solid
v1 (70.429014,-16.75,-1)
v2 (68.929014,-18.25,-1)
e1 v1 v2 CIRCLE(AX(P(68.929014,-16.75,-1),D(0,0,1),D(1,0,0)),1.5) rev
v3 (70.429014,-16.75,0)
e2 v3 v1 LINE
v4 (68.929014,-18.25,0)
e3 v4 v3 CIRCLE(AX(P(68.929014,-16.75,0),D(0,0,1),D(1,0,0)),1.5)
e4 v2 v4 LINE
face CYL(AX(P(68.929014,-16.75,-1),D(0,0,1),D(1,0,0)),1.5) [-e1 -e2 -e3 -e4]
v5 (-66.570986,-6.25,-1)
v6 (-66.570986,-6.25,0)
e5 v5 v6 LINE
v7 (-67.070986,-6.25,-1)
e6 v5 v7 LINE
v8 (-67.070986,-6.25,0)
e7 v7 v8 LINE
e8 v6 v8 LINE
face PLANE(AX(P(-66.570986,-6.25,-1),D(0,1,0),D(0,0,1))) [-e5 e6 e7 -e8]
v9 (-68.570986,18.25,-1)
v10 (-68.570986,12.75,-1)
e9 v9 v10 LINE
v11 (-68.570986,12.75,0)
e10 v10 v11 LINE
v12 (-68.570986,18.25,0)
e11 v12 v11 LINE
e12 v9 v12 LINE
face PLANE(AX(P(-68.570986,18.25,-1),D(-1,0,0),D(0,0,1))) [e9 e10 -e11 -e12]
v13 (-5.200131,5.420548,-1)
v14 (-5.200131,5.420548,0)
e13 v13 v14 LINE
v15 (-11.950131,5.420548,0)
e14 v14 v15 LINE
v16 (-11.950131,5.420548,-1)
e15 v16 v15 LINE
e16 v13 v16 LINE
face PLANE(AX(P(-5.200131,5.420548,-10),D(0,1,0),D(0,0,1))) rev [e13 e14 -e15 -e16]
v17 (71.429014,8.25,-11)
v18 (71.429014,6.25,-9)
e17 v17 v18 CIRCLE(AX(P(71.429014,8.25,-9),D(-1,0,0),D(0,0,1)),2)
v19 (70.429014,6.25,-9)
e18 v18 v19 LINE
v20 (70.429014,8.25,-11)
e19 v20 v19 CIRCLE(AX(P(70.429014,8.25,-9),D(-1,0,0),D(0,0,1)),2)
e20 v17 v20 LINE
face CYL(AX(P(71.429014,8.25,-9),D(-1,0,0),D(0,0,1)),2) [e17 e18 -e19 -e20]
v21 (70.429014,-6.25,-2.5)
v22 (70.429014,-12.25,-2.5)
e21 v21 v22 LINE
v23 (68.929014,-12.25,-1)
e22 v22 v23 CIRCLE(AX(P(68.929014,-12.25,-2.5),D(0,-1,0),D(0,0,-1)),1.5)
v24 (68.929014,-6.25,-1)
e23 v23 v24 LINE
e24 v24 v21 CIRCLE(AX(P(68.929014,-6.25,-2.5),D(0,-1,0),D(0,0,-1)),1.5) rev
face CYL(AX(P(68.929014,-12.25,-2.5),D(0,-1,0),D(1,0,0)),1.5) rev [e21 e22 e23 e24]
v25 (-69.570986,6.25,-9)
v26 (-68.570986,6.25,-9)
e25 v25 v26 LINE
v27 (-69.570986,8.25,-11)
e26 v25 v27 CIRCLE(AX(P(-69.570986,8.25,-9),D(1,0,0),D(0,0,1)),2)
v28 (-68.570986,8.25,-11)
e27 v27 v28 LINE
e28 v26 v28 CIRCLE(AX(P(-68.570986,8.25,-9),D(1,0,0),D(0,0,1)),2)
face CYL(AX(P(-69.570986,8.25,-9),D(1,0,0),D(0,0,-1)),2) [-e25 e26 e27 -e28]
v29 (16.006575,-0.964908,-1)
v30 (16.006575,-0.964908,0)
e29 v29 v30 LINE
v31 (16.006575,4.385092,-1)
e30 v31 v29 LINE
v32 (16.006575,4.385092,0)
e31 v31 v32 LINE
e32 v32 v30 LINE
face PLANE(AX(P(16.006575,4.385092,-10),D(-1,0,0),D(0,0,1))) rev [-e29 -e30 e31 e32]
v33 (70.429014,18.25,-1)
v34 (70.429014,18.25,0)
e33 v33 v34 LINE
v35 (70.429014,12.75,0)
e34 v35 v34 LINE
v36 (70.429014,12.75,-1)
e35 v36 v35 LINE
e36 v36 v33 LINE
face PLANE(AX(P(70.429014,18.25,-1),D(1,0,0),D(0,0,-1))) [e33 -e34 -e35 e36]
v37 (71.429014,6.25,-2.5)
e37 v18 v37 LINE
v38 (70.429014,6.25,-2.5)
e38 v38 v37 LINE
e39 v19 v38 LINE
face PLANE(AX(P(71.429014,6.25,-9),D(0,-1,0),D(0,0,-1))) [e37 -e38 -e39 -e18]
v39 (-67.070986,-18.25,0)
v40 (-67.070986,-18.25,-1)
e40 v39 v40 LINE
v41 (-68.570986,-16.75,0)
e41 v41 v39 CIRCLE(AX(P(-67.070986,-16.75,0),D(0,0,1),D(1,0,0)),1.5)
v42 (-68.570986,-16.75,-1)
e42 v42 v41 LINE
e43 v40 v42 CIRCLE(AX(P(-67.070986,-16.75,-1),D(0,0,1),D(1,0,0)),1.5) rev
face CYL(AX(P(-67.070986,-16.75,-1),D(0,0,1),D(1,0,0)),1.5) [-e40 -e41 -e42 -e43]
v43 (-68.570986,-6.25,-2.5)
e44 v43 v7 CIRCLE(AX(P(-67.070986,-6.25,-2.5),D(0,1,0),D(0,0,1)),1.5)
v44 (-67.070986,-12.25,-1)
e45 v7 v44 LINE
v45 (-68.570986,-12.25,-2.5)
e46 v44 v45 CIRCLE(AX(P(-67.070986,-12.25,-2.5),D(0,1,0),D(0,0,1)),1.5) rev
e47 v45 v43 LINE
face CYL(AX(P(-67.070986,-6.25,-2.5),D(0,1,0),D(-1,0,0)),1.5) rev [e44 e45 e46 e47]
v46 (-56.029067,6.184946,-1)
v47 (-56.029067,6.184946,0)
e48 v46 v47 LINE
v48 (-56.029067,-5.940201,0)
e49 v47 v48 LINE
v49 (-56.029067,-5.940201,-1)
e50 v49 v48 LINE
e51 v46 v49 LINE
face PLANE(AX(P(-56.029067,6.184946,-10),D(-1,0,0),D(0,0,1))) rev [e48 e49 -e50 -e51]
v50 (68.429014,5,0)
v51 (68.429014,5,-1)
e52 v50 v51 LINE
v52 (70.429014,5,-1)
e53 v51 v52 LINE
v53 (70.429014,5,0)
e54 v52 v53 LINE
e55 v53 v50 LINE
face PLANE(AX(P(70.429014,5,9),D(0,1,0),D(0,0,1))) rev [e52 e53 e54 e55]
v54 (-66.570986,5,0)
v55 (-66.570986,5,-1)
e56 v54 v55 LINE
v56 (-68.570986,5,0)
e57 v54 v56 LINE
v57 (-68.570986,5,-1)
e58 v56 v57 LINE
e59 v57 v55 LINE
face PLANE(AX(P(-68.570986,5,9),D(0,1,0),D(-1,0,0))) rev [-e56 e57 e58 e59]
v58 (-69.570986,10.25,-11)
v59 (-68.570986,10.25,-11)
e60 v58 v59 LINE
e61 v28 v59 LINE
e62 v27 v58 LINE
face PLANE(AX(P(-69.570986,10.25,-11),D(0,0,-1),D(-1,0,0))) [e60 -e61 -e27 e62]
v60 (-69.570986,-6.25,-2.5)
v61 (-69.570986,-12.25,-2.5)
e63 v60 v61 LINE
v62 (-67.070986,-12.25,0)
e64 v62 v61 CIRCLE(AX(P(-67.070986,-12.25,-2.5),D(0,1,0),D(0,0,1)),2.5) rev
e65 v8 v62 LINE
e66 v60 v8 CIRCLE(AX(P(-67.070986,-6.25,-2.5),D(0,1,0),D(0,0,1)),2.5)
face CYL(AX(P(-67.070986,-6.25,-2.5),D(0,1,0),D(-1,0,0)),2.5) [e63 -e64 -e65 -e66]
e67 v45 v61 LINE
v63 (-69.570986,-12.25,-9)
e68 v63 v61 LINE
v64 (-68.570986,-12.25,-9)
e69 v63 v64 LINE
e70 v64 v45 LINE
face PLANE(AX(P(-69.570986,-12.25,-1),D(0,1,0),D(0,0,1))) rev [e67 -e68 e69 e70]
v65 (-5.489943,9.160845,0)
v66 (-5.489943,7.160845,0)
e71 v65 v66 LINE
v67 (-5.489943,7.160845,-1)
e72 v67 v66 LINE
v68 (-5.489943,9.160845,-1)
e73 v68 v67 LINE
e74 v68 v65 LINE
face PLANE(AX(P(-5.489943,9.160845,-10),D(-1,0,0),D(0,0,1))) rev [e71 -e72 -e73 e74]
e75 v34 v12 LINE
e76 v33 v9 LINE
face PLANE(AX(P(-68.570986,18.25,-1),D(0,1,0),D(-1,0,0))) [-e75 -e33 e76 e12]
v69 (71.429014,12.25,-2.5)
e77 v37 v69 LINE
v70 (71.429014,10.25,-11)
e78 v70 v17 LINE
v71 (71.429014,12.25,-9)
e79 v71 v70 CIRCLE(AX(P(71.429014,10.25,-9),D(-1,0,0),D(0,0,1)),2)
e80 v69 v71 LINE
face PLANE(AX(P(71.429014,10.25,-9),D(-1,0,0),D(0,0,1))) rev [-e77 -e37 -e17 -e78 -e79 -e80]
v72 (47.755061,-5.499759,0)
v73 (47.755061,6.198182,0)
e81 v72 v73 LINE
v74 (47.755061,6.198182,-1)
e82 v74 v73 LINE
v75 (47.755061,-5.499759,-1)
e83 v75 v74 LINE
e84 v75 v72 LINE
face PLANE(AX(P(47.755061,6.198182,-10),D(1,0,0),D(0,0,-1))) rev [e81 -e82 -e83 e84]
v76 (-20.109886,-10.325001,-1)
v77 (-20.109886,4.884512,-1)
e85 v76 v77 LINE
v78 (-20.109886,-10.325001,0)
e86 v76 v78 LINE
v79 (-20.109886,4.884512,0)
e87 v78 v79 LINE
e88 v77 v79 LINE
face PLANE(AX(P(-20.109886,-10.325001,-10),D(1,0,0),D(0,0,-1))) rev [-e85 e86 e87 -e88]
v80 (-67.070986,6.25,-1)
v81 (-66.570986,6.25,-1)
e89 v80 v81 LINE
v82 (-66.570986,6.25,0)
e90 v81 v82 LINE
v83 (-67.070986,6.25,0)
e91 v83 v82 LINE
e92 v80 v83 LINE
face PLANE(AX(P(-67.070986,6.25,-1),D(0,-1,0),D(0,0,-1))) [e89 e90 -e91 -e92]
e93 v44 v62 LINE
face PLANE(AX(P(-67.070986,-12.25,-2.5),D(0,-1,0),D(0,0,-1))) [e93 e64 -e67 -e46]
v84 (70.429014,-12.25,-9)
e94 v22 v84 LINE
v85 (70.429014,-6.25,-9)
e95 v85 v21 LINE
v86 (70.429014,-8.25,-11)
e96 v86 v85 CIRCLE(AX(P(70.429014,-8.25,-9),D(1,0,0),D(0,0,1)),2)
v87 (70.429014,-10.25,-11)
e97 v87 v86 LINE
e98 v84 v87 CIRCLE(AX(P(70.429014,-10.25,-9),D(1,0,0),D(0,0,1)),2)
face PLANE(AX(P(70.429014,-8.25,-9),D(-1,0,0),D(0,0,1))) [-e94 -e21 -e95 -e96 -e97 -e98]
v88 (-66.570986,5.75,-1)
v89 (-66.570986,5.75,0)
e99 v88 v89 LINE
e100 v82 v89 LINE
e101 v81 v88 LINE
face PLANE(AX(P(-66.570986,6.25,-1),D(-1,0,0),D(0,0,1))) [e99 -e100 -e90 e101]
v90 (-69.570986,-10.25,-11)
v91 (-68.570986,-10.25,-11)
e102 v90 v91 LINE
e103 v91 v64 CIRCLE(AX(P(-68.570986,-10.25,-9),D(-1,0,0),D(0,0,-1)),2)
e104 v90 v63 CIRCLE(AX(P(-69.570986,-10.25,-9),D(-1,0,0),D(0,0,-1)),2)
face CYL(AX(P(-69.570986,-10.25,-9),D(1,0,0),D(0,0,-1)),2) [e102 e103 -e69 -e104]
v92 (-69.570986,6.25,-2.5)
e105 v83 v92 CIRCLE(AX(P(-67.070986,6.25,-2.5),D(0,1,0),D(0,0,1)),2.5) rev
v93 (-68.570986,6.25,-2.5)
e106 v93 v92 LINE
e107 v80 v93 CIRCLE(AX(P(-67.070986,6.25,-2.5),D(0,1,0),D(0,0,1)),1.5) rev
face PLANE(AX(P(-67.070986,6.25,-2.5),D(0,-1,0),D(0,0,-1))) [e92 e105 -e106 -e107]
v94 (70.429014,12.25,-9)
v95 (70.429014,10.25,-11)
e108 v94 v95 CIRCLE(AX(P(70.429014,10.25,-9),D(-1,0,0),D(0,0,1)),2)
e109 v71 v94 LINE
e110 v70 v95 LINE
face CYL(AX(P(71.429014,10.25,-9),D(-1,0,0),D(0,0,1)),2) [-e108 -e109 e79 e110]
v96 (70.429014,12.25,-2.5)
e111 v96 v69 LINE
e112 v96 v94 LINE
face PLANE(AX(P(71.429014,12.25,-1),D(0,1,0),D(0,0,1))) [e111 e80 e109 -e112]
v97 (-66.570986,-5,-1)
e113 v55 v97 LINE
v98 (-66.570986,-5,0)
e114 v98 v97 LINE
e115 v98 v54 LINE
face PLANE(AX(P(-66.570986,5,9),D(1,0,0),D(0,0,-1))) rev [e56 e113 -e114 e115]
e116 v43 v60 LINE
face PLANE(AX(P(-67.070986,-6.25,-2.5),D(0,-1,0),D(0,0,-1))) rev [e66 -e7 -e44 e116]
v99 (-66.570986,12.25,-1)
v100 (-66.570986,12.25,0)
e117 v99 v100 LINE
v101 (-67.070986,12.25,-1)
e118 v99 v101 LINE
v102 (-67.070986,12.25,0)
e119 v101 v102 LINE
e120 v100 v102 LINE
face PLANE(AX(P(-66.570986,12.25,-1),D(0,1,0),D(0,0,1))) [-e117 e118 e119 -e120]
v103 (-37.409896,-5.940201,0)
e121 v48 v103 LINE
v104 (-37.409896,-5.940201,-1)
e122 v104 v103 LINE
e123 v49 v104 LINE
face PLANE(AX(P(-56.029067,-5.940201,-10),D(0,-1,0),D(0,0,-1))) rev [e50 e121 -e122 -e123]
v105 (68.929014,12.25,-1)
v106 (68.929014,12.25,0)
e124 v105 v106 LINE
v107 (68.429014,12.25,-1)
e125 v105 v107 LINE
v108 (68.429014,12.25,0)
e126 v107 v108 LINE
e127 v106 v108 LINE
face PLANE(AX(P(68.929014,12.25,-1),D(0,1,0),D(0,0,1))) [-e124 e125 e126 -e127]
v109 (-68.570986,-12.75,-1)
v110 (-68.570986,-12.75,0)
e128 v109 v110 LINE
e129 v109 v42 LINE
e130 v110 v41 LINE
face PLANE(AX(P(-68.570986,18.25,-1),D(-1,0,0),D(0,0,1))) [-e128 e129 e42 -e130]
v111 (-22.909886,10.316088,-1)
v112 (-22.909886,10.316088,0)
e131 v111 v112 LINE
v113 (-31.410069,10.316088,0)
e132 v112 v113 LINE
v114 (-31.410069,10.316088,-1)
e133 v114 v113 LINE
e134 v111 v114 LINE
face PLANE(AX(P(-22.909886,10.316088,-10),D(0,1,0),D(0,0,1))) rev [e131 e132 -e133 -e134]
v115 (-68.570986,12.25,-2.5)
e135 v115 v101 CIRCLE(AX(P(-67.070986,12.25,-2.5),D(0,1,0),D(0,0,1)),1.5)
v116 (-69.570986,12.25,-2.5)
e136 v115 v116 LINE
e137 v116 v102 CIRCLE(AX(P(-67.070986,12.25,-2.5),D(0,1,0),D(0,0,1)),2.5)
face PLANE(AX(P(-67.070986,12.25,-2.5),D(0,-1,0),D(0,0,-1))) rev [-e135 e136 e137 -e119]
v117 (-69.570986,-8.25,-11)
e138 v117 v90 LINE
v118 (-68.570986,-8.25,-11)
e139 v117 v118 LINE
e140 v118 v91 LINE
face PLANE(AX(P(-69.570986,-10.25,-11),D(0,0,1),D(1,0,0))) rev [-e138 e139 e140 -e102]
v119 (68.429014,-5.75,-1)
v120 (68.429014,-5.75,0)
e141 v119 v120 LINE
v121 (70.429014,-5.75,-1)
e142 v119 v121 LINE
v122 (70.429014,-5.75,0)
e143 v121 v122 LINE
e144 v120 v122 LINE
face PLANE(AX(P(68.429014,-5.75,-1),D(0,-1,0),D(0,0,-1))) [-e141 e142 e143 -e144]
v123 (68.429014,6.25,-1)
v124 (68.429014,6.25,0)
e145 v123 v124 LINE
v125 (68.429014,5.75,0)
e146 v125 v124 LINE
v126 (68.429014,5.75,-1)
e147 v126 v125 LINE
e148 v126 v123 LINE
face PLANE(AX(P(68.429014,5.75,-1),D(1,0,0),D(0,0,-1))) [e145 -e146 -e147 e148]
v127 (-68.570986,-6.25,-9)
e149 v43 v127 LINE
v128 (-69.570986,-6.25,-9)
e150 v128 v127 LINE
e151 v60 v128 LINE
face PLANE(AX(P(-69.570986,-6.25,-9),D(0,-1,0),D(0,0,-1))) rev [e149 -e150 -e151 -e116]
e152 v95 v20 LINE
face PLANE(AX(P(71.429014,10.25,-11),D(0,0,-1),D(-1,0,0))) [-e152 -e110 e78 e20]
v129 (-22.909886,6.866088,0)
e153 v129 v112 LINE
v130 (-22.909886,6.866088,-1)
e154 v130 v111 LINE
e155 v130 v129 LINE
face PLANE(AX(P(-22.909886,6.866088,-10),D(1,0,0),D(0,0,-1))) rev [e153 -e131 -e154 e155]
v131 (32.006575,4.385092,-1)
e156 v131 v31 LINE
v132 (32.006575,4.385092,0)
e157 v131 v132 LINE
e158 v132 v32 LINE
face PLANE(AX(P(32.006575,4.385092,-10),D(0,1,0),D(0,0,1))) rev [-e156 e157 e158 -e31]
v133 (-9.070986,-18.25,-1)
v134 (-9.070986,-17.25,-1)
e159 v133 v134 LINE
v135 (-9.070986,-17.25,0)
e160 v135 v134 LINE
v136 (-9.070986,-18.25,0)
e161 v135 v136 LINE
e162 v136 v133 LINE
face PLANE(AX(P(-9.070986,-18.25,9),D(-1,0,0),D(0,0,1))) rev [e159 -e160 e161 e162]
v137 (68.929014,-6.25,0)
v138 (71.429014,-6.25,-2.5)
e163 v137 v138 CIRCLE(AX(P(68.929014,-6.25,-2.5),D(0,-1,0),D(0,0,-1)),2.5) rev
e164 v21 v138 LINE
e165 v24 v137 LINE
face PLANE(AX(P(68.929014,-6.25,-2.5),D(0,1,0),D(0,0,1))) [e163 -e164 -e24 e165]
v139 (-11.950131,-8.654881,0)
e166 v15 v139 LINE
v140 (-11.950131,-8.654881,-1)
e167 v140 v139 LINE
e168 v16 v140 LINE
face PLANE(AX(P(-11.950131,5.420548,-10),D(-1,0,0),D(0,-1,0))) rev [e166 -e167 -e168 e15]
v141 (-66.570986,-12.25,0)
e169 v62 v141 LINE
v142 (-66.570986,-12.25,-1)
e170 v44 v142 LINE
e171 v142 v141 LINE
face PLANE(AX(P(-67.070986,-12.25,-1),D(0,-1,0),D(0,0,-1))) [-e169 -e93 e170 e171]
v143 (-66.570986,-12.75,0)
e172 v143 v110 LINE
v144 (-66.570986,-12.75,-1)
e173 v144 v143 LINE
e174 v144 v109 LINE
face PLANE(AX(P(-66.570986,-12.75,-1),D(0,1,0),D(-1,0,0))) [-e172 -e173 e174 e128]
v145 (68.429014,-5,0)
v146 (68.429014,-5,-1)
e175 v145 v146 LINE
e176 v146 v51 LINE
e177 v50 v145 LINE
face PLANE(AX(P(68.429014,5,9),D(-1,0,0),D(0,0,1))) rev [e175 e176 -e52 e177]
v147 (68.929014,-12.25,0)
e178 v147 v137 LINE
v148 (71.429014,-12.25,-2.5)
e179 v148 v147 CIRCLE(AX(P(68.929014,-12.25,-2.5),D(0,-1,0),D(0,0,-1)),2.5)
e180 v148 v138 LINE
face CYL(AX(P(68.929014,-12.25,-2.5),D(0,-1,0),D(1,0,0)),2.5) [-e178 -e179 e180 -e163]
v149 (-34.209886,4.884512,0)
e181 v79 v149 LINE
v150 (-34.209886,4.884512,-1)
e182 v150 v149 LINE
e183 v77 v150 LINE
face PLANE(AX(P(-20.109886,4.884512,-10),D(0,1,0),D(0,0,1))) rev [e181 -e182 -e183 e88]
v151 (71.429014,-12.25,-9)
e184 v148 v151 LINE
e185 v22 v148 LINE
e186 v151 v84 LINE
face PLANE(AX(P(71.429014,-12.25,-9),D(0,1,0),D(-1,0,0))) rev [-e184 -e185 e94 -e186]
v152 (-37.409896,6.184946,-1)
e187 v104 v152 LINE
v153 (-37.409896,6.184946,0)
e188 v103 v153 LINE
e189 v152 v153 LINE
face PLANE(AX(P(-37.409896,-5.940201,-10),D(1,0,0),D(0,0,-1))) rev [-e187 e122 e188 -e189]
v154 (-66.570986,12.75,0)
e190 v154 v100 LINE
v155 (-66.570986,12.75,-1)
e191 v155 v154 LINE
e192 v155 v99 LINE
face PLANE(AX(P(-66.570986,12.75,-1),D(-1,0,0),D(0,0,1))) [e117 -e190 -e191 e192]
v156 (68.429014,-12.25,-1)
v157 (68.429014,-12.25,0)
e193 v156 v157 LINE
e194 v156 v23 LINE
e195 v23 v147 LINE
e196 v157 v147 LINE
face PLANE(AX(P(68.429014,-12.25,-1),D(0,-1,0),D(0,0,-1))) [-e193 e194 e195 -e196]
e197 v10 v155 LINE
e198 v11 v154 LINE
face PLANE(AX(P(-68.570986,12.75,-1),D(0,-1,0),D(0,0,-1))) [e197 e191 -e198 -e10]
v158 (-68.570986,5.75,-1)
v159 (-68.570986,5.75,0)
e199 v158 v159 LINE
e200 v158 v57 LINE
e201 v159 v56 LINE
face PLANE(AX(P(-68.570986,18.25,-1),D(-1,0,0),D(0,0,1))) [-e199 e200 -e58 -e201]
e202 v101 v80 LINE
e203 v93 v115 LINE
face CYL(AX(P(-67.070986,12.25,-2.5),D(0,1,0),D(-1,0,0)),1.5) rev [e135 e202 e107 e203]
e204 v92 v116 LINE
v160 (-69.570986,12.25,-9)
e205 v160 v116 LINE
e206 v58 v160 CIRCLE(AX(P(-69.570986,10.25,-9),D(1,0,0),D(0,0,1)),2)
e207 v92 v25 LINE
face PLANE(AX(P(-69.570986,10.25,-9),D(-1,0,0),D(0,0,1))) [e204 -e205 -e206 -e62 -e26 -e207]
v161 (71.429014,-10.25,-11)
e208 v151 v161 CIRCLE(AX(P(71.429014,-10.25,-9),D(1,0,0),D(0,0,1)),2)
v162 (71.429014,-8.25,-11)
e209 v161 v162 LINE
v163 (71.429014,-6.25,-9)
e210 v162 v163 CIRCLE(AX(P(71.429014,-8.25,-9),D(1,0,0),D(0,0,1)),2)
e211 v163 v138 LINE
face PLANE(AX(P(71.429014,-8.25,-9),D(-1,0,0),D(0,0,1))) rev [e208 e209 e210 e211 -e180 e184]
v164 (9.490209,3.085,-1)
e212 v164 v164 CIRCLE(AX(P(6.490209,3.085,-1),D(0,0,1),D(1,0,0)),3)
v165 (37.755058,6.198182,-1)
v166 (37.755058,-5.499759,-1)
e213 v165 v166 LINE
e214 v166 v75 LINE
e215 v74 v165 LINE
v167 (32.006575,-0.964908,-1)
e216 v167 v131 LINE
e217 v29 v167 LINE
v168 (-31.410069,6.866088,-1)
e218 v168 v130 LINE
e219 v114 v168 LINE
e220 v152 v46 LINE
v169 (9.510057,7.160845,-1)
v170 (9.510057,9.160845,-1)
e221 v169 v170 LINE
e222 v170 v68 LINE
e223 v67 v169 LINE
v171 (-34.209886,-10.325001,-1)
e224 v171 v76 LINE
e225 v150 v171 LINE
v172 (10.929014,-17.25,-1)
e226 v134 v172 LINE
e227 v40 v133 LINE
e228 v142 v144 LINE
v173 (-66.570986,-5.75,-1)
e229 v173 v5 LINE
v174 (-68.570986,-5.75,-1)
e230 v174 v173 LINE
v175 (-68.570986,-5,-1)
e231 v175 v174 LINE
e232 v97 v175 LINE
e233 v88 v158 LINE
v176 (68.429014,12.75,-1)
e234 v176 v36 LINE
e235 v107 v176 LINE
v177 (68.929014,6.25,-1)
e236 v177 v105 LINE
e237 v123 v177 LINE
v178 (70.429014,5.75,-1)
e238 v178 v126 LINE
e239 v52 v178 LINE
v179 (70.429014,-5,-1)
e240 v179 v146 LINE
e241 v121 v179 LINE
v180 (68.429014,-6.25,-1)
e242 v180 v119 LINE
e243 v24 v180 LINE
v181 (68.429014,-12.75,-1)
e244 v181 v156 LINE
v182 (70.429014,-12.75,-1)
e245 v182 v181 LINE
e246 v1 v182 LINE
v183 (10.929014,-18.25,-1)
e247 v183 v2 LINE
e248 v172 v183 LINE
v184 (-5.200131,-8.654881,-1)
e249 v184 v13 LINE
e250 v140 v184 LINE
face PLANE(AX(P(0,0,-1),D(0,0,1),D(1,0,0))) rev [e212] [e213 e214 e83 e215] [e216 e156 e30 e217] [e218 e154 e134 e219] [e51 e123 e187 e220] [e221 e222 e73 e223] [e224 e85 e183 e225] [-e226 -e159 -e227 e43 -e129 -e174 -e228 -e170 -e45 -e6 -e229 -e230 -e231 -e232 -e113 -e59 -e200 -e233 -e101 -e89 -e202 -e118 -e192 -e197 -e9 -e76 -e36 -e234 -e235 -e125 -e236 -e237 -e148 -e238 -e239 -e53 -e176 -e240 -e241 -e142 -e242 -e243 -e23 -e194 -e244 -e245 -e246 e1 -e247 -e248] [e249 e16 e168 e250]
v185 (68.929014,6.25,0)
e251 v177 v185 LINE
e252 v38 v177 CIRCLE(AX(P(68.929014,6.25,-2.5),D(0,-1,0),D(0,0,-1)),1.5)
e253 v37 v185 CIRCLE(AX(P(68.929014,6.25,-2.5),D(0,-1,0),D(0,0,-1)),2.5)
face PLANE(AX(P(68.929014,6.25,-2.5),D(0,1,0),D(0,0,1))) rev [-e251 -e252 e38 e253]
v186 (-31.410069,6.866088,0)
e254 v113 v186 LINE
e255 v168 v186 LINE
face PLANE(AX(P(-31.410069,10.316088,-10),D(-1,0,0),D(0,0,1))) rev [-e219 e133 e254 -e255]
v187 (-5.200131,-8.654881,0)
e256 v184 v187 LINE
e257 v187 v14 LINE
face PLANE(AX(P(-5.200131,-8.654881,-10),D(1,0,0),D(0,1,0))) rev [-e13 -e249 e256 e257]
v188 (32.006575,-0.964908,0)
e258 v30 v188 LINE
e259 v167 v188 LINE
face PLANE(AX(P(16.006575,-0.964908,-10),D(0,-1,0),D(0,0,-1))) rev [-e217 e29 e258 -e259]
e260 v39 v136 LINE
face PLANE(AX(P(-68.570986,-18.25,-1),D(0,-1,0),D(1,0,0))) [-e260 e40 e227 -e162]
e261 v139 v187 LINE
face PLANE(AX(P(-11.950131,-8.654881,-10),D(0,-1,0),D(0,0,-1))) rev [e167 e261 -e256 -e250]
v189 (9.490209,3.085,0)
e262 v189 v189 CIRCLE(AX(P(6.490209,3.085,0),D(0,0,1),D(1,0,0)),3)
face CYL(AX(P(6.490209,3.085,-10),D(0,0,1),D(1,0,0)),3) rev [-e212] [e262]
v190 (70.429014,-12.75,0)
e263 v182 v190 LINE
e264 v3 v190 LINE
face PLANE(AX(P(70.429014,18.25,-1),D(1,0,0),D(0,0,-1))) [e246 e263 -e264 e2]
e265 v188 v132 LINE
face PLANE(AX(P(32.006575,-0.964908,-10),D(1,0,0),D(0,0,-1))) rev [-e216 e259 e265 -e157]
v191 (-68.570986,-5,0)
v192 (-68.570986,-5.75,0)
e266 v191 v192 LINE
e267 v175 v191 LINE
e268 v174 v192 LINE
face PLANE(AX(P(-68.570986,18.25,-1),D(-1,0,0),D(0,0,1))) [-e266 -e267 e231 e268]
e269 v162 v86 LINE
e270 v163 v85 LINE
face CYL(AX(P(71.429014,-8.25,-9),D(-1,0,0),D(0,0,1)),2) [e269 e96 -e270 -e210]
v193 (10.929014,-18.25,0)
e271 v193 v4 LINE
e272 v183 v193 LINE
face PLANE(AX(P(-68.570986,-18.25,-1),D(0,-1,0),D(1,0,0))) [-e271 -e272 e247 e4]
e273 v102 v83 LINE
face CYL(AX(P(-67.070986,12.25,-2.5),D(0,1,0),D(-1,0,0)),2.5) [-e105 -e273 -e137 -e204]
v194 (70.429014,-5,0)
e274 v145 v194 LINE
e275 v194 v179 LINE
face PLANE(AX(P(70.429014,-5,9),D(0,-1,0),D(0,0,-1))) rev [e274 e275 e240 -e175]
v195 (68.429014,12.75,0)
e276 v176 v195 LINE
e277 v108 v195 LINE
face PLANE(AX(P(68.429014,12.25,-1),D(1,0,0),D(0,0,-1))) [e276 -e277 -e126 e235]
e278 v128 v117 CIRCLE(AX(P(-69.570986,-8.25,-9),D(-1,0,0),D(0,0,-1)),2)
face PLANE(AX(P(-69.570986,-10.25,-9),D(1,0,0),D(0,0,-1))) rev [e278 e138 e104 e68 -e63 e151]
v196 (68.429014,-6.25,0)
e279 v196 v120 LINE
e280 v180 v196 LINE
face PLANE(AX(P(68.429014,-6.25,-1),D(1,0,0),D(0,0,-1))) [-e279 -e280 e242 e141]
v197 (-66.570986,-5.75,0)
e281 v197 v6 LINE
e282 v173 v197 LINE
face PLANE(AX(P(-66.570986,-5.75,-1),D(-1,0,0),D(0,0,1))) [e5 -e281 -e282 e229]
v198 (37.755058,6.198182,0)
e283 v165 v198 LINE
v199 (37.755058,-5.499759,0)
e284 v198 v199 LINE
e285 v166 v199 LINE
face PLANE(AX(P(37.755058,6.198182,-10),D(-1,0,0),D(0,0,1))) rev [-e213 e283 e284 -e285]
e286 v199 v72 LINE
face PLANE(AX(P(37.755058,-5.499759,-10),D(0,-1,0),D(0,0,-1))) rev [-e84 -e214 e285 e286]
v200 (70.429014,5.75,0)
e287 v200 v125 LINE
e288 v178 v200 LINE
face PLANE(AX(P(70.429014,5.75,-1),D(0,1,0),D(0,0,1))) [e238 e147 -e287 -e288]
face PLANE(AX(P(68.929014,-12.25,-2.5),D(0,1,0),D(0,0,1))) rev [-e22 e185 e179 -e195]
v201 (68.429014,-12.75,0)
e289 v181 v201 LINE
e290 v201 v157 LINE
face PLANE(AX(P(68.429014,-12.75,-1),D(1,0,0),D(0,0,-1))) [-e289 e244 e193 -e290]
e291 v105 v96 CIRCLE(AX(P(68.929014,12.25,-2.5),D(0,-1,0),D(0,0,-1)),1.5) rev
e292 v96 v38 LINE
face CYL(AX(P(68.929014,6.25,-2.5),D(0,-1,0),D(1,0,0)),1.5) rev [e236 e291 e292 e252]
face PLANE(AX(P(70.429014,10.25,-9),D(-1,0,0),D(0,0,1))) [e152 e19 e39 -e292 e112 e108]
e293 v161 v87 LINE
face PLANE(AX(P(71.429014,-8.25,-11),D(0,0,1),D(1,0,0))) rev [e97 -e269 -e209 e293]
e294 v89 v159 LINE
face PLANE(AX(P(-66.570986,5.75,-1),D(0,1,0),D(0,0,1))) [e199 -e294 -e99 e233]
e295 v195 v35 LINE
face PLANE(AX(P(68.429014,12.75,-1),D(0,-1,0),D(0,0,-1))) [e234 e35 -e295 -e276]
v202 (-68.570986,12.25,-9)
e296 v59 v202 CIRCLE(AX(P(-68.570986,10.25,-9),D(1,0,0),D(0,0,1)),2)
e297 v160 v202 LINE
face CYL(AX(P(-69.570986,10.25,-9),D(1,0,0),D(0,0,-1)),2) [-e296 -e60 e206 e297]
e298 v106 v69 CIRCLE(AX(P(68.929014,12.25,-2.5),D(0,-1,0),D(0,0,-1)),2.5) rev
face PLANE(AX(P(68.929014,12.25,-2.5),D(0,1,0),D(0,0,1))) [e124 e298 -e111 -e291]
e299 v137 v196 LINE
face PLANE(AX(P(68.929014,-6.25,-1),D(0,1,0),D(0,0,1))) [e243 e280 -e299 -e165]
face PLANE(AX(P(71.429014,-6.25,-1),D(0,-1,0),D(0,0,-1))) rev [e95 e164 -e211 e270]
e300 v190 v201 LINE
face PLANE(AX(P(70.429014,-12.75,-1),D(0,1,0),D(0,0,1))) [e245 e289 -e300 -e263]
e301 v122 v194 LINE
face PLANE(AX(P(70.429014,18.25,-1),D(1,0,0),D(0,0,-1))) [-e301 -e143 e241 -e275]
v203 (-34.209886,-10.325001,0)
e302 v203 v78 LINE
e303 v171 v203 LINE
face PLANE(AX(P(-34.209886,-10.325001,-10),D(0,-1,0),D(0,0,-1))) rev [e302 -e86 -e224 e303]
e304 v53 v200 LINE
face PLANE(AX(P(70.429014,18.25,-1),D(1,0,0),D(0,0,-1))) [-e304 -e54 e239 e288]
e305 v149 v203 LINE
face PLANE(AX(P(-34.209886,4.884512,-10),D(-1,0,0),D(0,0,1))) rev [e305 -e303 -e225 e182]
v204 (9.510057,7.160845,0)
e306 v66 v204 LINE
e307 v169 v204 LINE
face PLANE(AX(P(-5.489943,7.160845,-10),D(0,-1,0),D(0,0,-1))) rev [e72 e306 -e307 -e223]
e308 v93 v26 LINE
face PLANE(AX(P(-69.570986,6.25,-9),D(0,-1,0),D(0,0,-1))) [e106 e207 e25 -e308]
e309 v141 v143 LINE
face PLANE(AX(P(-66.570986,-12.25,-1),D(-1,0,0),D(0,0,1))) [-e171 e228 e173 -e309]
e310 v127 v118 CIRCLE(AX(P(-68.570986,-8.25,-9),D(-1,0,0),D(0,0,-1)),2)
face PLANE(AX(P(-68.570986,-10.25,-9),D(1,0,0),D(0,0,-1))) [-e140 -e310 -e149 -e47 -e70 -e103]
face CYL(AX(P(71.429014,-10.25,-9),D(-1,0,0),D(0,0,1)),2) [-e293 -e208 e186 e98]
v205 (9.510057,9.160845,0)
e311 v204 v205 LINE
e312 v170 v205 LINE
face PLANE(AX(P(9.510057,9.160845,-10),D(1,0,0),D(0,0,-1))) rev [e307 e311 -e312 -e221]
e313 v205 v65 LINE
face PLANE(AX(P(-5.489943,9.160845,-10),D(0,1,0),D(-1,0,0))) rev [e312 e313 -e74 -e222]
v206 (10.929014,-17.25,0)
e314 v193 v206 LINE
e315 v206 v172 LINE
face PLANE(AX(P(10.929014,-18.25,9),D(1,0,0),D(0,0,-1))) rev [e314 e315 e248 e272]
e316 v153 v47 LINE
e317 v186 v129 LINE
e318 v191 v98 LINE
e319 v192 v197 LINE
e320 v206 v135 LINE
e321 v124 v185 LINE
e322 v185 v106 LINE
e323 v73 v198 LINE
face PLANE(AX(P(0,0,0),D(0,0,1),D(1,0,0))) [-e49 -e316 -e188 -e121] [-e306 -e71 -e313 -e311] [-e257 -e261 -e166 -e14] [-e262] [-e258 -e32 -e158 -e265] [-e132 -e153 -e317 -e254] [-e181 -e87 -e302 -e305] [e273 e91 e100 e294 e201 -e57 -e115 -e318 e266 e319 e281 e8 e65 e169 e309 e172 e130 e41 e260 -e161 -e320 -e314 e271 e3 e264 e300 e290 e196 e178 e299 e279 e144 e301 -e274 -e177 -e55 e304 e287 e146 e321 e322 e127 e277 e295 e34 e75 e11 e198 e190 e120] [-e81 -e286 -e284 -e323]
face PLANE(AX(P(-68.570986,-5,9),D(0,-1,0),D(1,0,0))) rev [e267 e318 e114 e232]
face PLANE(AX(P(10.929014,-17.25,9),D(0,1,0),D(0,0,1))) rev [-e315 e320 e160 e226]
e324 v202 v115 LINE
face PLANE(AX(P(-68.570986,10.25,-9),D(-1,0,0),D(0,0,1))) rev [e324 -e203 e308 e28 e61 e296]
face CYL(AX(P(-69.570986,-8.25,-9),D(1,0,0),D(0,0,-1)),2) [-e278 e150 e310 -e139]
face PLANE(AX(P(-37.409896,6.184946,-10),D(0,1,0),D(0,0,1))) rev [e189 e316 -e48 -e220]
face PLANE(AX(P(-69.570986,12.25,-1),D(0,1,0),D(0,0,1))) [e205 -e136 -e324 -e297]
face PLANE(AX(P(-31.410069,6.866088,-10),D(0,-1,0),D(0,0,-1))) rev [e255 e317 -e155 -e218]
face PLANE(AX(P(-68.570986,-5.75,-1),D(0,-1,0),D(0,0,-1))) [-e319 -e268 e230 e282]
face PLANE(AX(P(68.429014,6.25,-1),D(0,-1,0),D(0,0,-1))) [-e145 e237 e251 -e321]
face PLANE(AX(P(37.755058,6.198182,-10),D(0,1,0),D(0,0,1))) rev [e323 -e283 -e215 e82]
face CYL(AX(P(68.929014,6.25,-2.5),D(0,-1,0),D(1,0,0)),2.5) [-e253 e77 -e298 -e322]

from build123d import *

# Parameters (mm, degrees)
SKETCH1_W                       = 139
SKETCH1_H                       = 36.5
BASE_FLANGE1_DEPTH              = 1
EDGE_FLANGE1_STRIP_W            = 7
EDGE_FLANGE1_STRIP_H            = 1
EDGE_FLANGE1_STRIP_CUT_DEPTH    = 6
EDGE_FLANGE1_RELIEF_W           = 7.5
EDGE_FLANGE1_RELIEF_H           = 0.5
EDGE_FLANGE1_RELIEF_CUT_DEPTH   = 1
EDGE_FLANGE1_STRIP_2_W          = 7
EDGE_FLANGE1_STRIP_2_H          = 1
EDGE_FLANGE1_STRIP_CUT_2_DEPTH  = 6
EDGE_FLANGE1_RELIEF_2_W         = 7.5
EDGE_FLANGE1_RELIEF_2_H         = 0.5
EDGE_FLANGE1_RELIEF_CUT_2_DEPTH = 1
EDGE_FLANGE1_DEPTH              = 6
EDGE_FLANGE1_START              = -1
EDGE_FLANGE1_FLAT_DEPTH         = 1
EDGE_FLANGE1_BEND_DEPTH         = 6
EDGE_FLANGE1_FLAT_2_DEPTH       = 1
EDGE_FLANGE2_STRIP_W            = 7
EDGE_FLANGE2_STRIP_H            = 1
EDGE_FLANGE2_STRIP_CUT_DEPTH    = 6
EDGE_FLANGE2_RELIEF_W           = 7.5
EDGE_FLANGE2_RELIEF_H           = 0.5
EDGE_FLANGE2_RELIEF_CUT_DEPTH   = 1
EDGE_FLANGE2_STRIP_2_W          = 7
EDGE_FLANGE2_STRIP_2_H          = 1
EDGE_FLANGE2_STRIP_CUT_2_DEPTH  = 6
EDGE_FLANGE2_RELIEF_2_W         = 7.5
EDGE_FLANGE2_RELIEF_2_H         = 0.5
EDGE_FLANGE2_RELIEF_CUT_2_DEPTH = 1
EDGE_FLANGE2_DEPTH              = 6
EDGE_FLANGE2_START              = 1
EDGE_FLANGE2_FLAT_DEPTH         = 1
EDGE_FLANGE2_BEND_DEPTH         = 6
EDGE_FLANGE2_FLAT_2_DEPTH       = 1
SKETCH20_W                      = 20
SKETCH20_H                      = 1
SKETCH20_W_2                    = 2
SKETCH20_H_2                    = 10
CUT_EXTRUDE1_DEPTH              = 10
FILLET1_R                       = 1.5
SKETCH21_W                      = 15
SKETCH21_H                      = 2
SKETCH21_W_2                    = 17.619171599
SKETCH21_H_2                    = 11.12514716
SKETCH21_W_3                    = 13.1
SKETCH21_H_3                    = 14.209512824
SKETCH21_W_4                    = 5.75
SKETCH21_H_4                    = 13.075429167
SKETCH21_H_5                    = 4.35
CUT_EXTRUDE2_DEPTH              = 10
SKETCH22_R                      = 3
SKETCH22_W                      = 8.50018288
SKETCH22_H                      = 3.45
SKETCH22_W_2                    = 10.00000232
SKETCH22_H_2                    = 11.697941419
SKETCH22_W_3                    = 18.619171599
SKETCH22_H_3                    = 12.12514716
SKETCH22_W_4                    = 17.619171599
SKETCH22_H_4                    = 11.12514716
SKETCH22_W_5                    = 14.1
SKETCH22_H_5                    = 15.209512824
SKETCH22_W_6                    = 13.1
SKETCH22_H_6                    = 14.209512824
SKETCH22_W_7                    = 6.75
SKETCH22_H_7                    = 14.075429167
SKETCH22_W_8                    = 5.75
SKETCH22_H_8                    = 13.075429167
SKETCH22_W_9                    = 16
SKETCH22_H_9                    = 5.35
SKETCH22_W_10                   = 15
SKETCH22_H_10                   = 4.35
CUT_EXTRUDE3_DEPTH              = 10


# Sheet-metal steps are written as plain solids
with BuildPart() as part:
    # Sketch1 → Base-Flange1 (new body)
    with BuildSketch(Plane.XY):
        with Locations((0.929014267, 0)):
            Rectangle(SKETCH1_W, SKETCH1_H)
    extrude(amount=-BASE_FLANGE1_DEPTH)

    # Edge-Flange1 strip (across the edge) → Edge-Flange1 strip cut (cut)
    with BuildSketch(Plane(origin=(-68.570985733, 6.25, -1), x_dir=(1, 0, 0), z_dir=(0, 1, 0))):
        with Locations((-2, -0.5)):
            Rectangle(EDGE_FLANGE1_STRIP_W, EDGE_FLANGE1_STRIP_H)
    extrude(amount=EDGE_FLANGE1_STRIP_CUT_DEPTH, mode=Mode.SUBTRACT)

    # Edge-Flange1 relief (on the sheet) → Edge-Flange1 relief cut (cut)
    with BuildSketch(Plane(origin=(-67.070985733, 6.25, -1), x_dir=(1, 0, 0), z_dir=(0, 0, -1))):
        with Locations((-3.25, 0.25)):
            Rectangle(EDGE_FLANGE1_RELIEF_W, EDGE_FLANGE1_RELIEF_H)
        with Locations((-3.25, -6.25)):
            Rectangle(EDGE_FLANGE1_RELIEF_W, EDGE_FLANGE1_RELIEF_H)
    extrude(amount=-EDGE_FLANGE1_RELIEF_CUT_DEPTH, mode=Mode.SUBTRACT)

    # Edge-Flange1 strip 2 (across the edge) → Edge-Flange1 strip cut 2 (cut)
    with BuildSketch(Plane(origin=(70.429014267, 12.25, -1), x_dir=(-1, 0, 0), z_dir=(0, -1, 0))):
        with Locations((-2, -0.5)):
            Rectangle(EDGE_FLANGE1_STRIP_2_W, EDGE_FLANGE1_STRIP_2_H)
    extrude(amount=EDGE_FLANGE1_STRIP_CUT_2_DEPTH, mode=Mode.SUBTRACT)

    # Edge-Flange1 relief 2 (on the sheet) → Edge-Flange1 relief cut 2 (cut)
    with BuildSketch(Plane(origin=(68.929014267, 12.25, -1), x_dir=(-1, 0, 0), z_dir=(0, 0, -1))):
        with Locations((-3.25, 0.25)):
            Rectangle(EDGE_FLANGE1_RELIEF_2_W, EDGE_FLANGE1_RELIEF_2_H)
        with Locations((-3.25, -6.25)):
            Rectangle(EDGE_FLANGE1_RELIEF_2_W, EDGE_FLANGE1_RELIEF_2_H)
    extrude(amount=-EDGE_FLANGE1_RELIEF_CUT_2_DEPTH, mode=Mode.SUBTRACT)

    # Edge-Flange1 bend section (across the edge) → Edge-Flange1 (add)
    with BuildSketch(Plane(origin=(-68.570985733, 6.25, -1), x_dir=(1, 0, 0), z_dir=(0, 1, 0))):
        with BuildLine():
            Line((-1, 1.5), (0, 1.5))
            ThreePointArc((0, 1.5), (0.439339828, 0.439339828), (1.5, 0))
            Line((1.5, 0), (1.5, -1))
            ThreePointArc((1.5, -1), (-0.267766953, -0.267766953), (-1, 1.5))
        make_face()
    extrude(amount=EDGE_FLANGE1_DEPTH)

    # Edge-Flange1 profile (on flange) → Edge-Flange1 flat (add)
    with BuildSketch(Plane(origin=(-68.570985733, 0, -1), x_dir=(0, -1, 0), z_dir=(1, 0, 0)).offset(EDGE_FLANGE1_START)):
        with BuildLine():
            ThreePointArc((-6.25, 8), (-6.835786438, 9.414213562), (-8.25, 10))
            Line((-8.25, 10), (-10.25, 10))
            ThreePointArc((-10.25, 10), (-11.664213562, 9.414213562), (-12.25, 8))
            Line((-12.25, 8), (-12.25, 1.5))
            Line((-12.25, 1.5), (-6.25, 1.5))
            Line((-6.25, 1.5), (-6.25, 8))
        make_face()
    extrude(amount=EDGE_FLANGE1_FLAT_DEPTH)

    # Edge-Flange1 bend section 2 (across the edge) → Edge-Flange1 bend (add)
    with BuildSketch(Plane(origin=(70.429014267, 12.25, -1), x_dir=(-1, 0, 0), z_dir=(0, -1, 0))):
        with BuildLine():
            Line((-1, 1.5), (0, 1.5))
            ThreePointArc((0, 1.5), (0.439339828, 0.439339828), (1.5, 0))
            Line((1.5, 0), (1.5, -1))
            ThreePointArc((1.5, -1), (-0.267766953, -0.267766953), (-1, 1.5))
        make_face()
    extrude(amount=EDGE_FLANGE1_BEND_DEPTH)

    # Edge-Flange1 profile 2 (on flange) → Edge-Flange1 flat 2 (add)
    with BuildSketch(Plane(origin=(70.429014267, 0, -1), x_dir=(0, 1, 0), z_dir=(-1, 0, 0)).offset(EDGE_FLANGE1_START)):
        with BuildLine():
            Line((12.25, 1.5), (12.25, 8))
            ThreePointArc((12.25, 8), (11.664213562, 9.414213562), (10.25, 10))
            Line((10.25, 10), (8.25, 10))
            ThreePointArc((8.25, 10), (6.835786438, 9.414213562), (6.25, 8))
            Line((6.25, 8), (6.25, 1.5))
            Line((6.25, 1.5), (12.25, 1.5))
        make_face()
    extrude(amount=EDGE_FLANGE1_FLAT_2_DEPTH)

    # Edge-Flange2 strip (across the edge) → Edge-Flange2 strip cut (cut)
    with BuildSketch(Plane(origin=(70.429014267, -6.25, -1), x_dir=(-1, 0, 0), z_dir=(0, -1, 0))):
        with Locations((-2, -0.5)):
            Rectangle(EDGE_FLANGE2_STRIP_W, EDGE_FLANGE2_STRIP_H)
    extrude(amount=EDGE_FLANGE2_STRIP_CUT_DEPTH, mode=Mode.SUBTRACT)

    # Edge-Flange2 relief (on the sheet) → Edge-Flange2 relief cut (cut)
    with BuildSketch(Plane(origin=(68.929014267, -6.25, -1), x_dir=(-1, 0, 0), z_dir=(0, 0, -1))):
        with Locations((-3.25, 0.25)):
            Rectangle(EDGE_FLANGE2_RELIEF_W, EDGE_FLANGE2_RELIEF_H)
        with Locations((-3.25, -6.25)):
            Rectangle(EDGE_FLANGE2_RELIEF_W, EDGE_FLANGE2_RELIEF_H)
    extrude(amount=-EDGE_FLANGE2_RELIEF_CUT_DEPTH, mode=Mode.SUBTRACT)

    # Edge-Flange2 strip 2 (across the edge) → Edge-Flange2 strip cut 2 (cut)
    with BuildSketch(Plane(origin=(-68.570985733, -12.25, -1), x_dir=(1, 0, 0), z_dir=(0, 1, 0))):
        with Locations((-2, -0.5)):
            Rectangle(EDGE_FLANGE2_STRIP_2_W, EDGE_FLANGE2_STRIP_2_H)
    extrude(amount=EDGE_FLANGE2_STRIP_CUT_2_DEPTH, mode=Mode.SUBTRACT)

    # Edge-Flange2 relief 2 (on the sheet) → Edge-Flange2 relief cut 2 (cut)
    with BuildSketch(Plane(origin=(-67.070985733, -12.25, -1), x_dir=(1, 0, 0), z_dir=(0, 0, -1))):
        with Locations((-3.25, 0.25)):
            Rectangle(EDGE_FLANGE2_RELIEF_2_W, EDGE_FLANGE2_RELIEF_2_H)
        with Locations((-3.25, -6.25)):
            Rectangle(EDGE_FLANGE2_RELIEF_2_W, EDGE_FLANGE2_RELIEF_2_H)
    extrude(amount=-EDGE_FLANGE2_RELIEF_CUT_2_DEPTH, mode=Mode.SUBTRACT)

    # Edge-Flange2 bend section (across the edge) → Edge-Flange2 (add)
    with BuildSketch(Plane(origin=(70.429014267, -6.25, -1), x_dir=(-1, 0, 0), z_dir=(0, -1, 0))):
        with BuildLine():
            Line((-1, 1.5), (0, 1.5))
            ThreePointArc((0, 1.5), (0.439339828, 0.439339828), (1.5, 0))
            Line((1.5, 0), (1.5, -1))
            ThreePointArc((1.5, -1), (-0.267766953, -0.267766953), (-1, 1.5))
        make_face()
    extrude(amount=EDGE_FLANGE2_DEPTH)

    # Edge-Flange2 profile (on flange) → Edge-Flange2 flat (add)
    with BuildSketch(Plane(origin=(70.429014267, 0, -1), x_dir=(0, -1, 0), z_dir=(1, 0, 0)).offset(EDGE_FLANGE2_START)):
        with BuildLine():
            Line((12.25, 1.5), (12.25, 8))
            ThreePointArc((12.25, 8), (11.664213562, 9.414213562), (10.25, 10))
            Line((10.25, 10), (8.25, 10))
            ThreePointArc((8.25, 10), (6.835786438, 9.414213562), (6.25, 8))
            Line((6.25, 8), (6.25, 1.5))
            Line((6.25, 1.5), (12.25, 1.5))
        make_face()
    extrude(amount=-EDGE_FLANGE2_FLAT_DEPTH)

    # Edge-Flange2 bend section 2 (across the edge) → Edge-Flange2 bend (add)
    with BuildSketch(Plane(origin=(-68.570985733, -12.25, -1), x_dir=(1, 0, 0), z_dir=(0, 1, 0))):
        with BuildLine():
            Line((-1, 1.5), (0, 1.5))
            ThreePointArc((0, 1.5), (0.439339828, 0.439339828), (1.5, 0))
            Line((1.5, 0), (1.5, -1))
            ThreePointArc((1.5, -1), (-0.267766953, -0.267766953), (-1, 1.5))
        make_face()
    extrude(amount=EDGE_FLANGE2_BEND_DEPTH)

    # Edge-Flange2 profile 2 (on flange) → Edge-Flange2 flat 2 (add)
    with BuildSketch(Plane(origin=(-68.570985733, 0, -1), x_dir=(0, 1, 0), z_dir=(-1, 0, 0)).offset(EDGE_FLANGE2_START)):
        with BuildLine():
            ThreePointArc((-6.25, 8), (-6.835786438, 9.414213562), (-8.25, 10))
            Line((-8.25, 10), (-10.25, 10))
            ThreePointArc((-10.25, 10), (-11.664213562, 9.414213562), (-12.25, 8))
            Line((-12.25, 8), (-12.25, 1.5))
            Line((-12.25, 1.5), (-6.25, 1.5))
            Line((-6.25, 1.5), (-6.25, 8))
        make_face()
    extrude(amount=-EDGE_FLANGE2_FLAT_2_DEPTH)

    # Sketch20 → Cut-Extrude1 (cut)
    with BuildSketch(Plane(origin=(0, 0, -1), x_dir=(-1, 0, 0), z_dir=(0, 0, -1))):
        with Locations((-0.929014267, -17.75)):
            Rectangle(SKETCH20_W, SKETCH20_H)
        with Locations((-69.429014267, 0)):
            Rectangle(SKETCH20_W_2, SKETCH20_H_2)
        with Locations((67.570985733, 0)):
            Rectangle(SKETCH20_W_2, SKETCH20_H_2)
    extrude(amount=-CUT_EXTRUDE1_DEPTH, mode=Mode.SUBTRACT)

    # Fillet1
    fillet1_edges = [part.edges().sort_by_distance(p)[0] for p in [
        (70.429014267, -18.25, -0.5),
        (-68.570985733, -18.25, -0.5),
    ]]
    fillet(fillet1_edges, radius=FILLET1_R)

    # Sketch21 → Cut-Extrude2 (cut)
    with BuildSketch(Plane.XY):
        with Locations((2.010056647, 8.16084548)):
            Rectangle(SKETCH21_W, SKETCH21_H)
        with Locations((-46.719481313, 0.12237266)):
            Rectangle(SKETCH21_W_2, SKETCH21_H_2)
        with Locations((-27.159885853, -2.720244568)):
            Rectangle(SKETCH21_W_3, SKETCH21_H_3)
        with Locations((-8.575130533, -1.617166732)):
            Rectangle(SKETCH21_W_4, SKETCH21_H_4)
        with Locations((24.006575187, 1.71009184)):
            Rectangle(SKETCH21_W, SKETCH21_H_5)
    extrude(amount=-CUT_EXTRUDE2_DEPTH, mode=Mode.SUBTRACT)

    # Sketch22 → Cut-Extrude3 (cut)
    # profile 1 of 7: a face of its own
    with BuildSketch(Plane.XY):
        with Locations((6.490209407, 3.08500012)):
            Circle(SKETCH22_R)
    # profile 2 of 7: a face of its own
    with BuildSketch(Plane.XY):
        with Locations((-27.159977293, 8.5910876)):
            Rectangle(SKETCH22_W, SKETCH22_H)
    # profile 3 of 7: a face of its own
    with BuildSketch(Plane.XY):
        with Locations((42.755059407, 0.349211789)):
            Rectangle(SKETCH22_W_2, SKETCH22_H_2)
    # profile 4 of 7: a face of its own
    with BuildSketch(Plane.XY):
        with Locations((-46.719481313, 0.12237266)):
            Rectangle(SKETCH22_W_3, SKETCH22_H_3)
        with Locations((-46.719481313, 0.12237266)):
            Rectangle(SKETCH22_W_4, SKETCH22_H_4, mode=Mode.SUBTRACT)
    # profile 5 of 7: a face of its own
    with BuildSketch(Plane.XY):
        with Locations((-27.159885853, -2.720244568)):
            Rectangle(SKETCH22_W_5, SKETCH22_H_5)
        with Locations((-27.159885853, -2.720244568)):
            Rectangle(SKETCH22_W_6, SKETCH22_H_6, mode=Mode.SUBTRACT)
    # profile 6 of 7: a face of its own
    with BuildSketch(Plane.XY):
        with Locations((-8.575130533, -1.617166732)):
            Rectangle(SKETCH22_W_7, SKETCH22_H_7)
        with Locations((-8.575130533, -1.617166732)):
            Rectangle(SKETCH22_W_8, SKETCH22_H_8, mode=Mode.SUBTRACT)
    # profile 7 of 7: a face of its own
    with BuildSketch(Plane.XY):
        with Locations((24.006575187, 1.71009184)):
            Rectangle(SKETCH22_W_9, SKETCH22_H_9)
        with Locations((24.006575187, 1.71009184)):
            Rectangle(SKETCH22_W_10, SKETCH22_H_10, mode=Mode.SUBTRACT)
    extrude(amount=-CUT_EXTRUDE3_DEPTH, mode=Mode.SUBTRACT)


solid = part.part
